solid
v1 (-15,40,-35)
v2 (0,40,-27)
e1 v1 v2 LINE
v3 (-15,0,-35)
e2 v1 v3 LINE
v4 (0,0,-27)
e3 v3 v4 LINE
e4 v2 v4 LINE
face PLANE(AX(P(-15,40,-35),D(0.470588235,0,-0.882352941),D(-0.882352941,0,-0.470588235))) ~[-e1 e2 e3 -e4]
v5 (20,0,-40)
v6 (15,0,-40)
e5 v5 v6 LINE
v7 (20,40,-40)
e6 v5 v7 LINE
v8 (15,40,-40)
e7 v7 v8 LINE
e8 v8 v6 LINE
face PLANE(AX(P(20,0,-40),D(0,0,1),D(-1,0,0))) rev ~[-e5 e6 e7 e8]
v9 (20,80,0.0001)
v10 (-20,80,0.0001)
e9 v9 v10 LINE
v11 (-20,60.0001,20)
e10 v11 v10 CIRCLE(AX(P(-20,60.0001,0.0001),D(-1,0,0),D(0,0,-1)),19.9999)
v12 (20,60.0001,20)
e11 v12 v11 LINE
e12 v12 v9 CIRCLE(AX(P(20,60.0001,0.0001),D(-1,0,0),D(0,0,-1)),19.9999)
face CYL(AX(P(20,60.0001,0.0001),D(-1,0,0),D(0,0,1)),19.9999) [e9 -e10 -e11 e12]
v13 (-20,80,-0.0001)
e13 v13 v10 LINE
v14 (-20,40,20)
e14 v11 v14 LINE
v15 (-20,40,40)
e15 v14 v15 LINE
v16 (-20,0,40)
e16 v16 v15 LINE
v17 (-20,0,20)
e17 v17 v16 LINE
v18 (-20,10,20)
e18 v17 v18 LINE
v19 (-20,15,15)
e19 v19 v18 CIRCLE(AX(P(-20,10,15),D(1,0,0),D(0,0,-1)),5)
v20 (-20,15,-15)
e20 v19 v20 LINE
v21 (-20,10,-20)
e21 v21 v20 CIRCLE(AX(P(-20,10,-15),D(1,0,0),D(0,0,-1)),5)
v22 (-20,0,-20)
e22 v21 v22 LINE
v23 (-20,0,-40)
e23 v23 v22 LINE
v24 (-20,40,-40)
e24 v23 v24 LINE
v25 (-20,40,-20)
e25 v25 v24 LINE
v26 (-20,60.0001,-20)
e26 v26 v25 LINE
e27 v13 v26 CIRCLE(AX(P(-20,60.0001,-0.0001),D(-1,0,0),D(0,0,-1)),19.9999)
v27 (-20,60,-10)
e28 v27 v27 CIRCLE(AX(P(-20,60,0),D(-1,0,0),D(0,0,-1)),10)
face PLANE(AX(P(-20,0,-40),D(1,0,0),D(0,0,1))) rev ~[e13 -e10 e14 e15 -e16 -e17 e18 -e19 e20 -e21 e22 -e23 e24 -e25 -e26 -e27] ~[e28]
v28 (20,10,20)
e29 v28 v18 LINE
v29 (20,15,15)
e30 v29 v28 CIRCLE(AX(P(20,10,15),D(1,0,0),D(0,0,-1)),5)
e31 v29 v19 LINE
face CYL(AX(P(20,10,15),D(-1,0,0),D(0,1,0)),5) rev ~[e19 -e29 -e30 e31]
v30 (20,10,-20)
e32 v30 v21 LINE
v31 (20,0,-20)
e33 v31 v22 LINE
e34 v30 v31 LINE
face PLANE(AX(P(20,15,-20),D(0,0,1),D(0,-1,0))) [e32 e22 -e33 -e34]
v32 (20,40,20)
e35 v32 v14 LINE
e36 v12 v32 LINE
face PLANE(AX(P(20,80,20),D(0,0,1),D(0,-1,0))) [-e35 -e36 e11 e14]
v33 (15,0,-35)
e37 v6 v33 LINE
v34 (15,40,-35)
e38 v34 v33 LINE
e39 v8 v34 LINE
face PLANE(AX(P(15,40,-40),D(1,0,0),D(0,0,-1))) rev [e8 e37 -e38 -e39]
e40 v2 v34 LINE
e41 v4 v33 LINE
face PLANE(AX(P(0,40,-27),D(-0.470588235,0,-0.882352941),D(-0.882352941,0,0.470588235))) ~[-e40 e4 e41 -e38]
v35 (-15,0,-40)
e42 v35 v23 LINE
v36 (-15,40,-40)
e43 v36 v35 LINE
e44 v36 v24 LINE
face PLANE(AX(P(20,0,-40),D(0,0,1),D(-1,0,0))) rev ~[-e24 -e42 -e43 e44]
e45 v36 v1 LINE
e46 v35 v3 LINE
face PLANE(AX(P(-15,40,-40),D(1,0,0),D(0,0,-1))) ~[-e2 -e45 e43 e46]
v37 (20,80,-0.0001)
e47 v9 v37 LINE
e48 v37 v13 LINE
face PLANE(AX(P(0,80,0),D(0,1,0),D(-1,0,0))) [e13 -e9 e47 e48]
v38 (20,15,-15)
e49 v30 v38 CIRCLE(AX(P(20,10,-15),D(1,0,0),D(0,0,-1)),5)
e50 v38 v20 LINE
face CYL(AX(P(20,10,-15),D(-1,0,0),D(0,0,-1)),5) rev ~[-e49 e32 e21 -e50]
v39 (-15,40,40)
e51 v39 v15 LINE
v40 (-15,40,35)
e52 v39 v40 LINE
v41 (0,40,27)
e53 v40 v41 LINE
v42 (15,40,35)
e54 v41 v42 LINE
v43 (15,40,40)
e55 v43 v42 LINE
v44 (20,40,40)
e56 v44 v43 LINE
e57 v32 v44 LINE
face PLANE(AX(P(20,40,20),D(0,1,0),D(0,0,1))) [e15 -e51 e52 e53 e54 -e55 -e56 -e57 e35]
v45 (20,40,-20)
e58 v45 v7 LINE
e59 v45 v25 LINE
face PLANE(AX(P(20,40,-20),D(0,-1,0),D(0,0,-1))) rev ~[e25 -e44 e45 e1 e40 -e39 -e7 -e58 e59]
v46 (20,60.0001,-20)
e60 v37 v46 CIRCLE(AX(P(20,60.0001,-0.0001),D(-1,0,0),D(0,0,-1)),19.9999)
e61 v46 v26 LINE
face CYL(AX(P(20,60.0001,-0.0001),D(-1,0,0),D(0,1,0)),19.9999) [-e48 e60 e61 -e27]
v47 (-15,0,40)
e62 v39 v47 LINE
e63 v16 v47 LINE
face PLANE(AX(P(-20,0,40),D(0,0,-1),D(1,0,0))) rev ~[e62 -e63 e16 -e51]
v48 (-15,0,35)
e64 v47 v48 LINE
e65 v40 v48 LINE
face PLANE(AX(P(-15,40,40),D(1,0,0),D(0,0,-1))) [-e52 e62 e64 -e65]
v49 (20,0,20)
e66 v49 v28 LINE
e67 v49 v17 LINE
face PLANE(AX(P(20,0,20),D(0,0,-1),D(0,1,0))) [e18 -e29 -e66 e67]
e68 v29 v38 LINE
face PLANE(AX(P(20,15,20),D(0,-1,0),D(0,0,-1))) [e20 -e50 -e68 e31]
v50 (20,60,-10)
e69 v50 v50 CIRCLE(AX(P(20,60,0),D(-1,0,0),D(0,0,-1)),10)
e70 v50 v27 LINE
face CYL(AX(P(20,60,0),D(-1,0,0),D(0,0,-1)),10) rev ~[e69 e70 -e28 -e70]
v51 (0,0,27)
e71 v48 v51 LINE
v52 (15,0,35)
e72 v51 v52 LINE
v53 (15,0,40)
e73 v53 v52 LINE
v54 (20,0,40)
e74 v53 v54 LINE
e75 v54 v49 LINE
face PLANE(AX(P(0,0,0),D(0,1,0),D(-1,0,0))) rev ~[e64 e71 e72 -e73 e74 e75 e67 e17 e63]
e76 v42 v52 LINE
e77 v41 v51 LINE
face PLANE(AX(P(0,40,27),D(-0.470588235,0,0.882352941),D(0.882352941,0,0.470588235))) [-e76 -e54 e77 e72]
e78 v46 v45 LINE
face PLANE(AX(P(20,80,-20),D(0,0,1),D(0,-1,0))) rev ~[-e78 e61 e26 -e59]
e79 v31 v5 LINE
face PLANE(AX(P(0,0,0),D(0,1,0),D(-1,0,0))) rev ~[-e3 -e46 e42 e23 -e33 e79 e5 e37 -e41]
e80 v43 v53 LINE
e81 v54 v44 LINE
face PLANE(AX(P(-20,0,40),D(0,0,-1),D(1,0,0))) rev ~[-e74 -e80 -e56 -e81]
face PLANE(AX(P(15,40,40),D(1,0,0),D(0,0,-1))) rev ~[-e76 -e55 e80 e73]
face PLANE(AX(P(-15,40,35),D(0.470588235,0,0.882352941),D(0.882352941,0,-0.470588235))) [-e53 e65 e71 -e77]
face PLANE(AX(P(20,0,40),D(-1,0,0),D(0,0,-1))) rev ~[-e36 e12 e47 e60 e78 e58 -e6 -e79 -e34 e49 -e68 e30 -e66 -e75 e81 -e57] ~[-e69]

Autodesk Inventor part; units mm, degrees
ref_plane "YZ Plane" through (0, 0, 0) normal (1, 0, 0) x (0, 1, 0)
ref_plane "XZ Plane" through (0, 0, 0) normal (0, 1, 0) x (-1, 0, 0)
ref_plane "XY Plane" through (0, 0, 0) normal (0, 0, 1) x (1, 0, 0)
sketch "Esboço1" plane through (0, 0, 0) normal (0, 1, 0) x (-1, 0, 0)
  line L0 (20, 40) -> (-20, 40)
  line L1 (-20, 40) -> (-20, -40)
  line L2 (-20, -40) -> (20, -40)
  line L3 (20, -40) -> (20, 40)
  line L4 (20, 40) -> (-20, -40) construction
  line L5 (-20, 40) -> (20, -40) construction
  point P0 (0, 0)
  dimension "d0" = 40
  dimension "d1" = 80
extrude "Extrusão1" add sketch "Esboço1" along normal blind 80
sketch "Esboço2" plane through (20, 0, 40) normal (1, 0, 0) x (0, 0, -1)
  line L0 (0, 80) -> (80, 80) projected
  line L1 (0, 80) -> (20, 80)
  line L2 (20, 80) -> (20, 40)
  line L3 (20, 40) -> (0, 40)
  line L4 (0, 40) -> (0, 80)
  line L5 (80, 80) -> (60, 80)
  line L6 (60, 80) -> (60, 40)
  line L7 (60, 40) -> (80, 40)
  line L8 (80, 40) -> (80, 80)
  line L9 (0, 0) -> (80, 0) projected
  point P0 (40, 0)
  point P1 (60, 60)
  point P2 (20, 80)
  dimension "d4" = 40
  dimension "d5" = 20
  dimension "d6" = 20
extrude "Extrusão2" cut sketch "Esboço2" against normal blind 80
fillet "Arredondamento1" radius 20 2 edges at (0, 80, 20) (0, 80, -20)
sketch "Esboço3" plane through (20, 0, 40) normal (1, 0, 0) x (0, 0, -1)
  arc A0 (60, 60) -> (20, 60) centre (40, 60) ccw projected
  point P0 (40, 0)
hole "Furo1" at (20, 60, 0) direction (-1, 0, 0) diameter 20 end through all
sketch "Esboço4" plane through (20, 40, 40) normal (0, 1, 0) x (1, 0, 0)
  line L0 (0, 0) -> (0, 80) projected
  line L1 (0, 0) -> (-5, 0)
  line L2 (-40, 0) -> (0, 0) projected
  line L3 (-5, 0) -> (-5, 5)
  line L4 (-40, 0) -> (-35, 0)
  line L5 (-35, 0) -> (-35, 5)
  line L6 (-35, 0) -> (-20, 0) construction
  line L7 (-20, 0) -> (-20, 13) construction
  line L8 (-35, 5) -> (-20, 13)
  line L9 (-20, 13) -> (-5, 5)
  point P0 (-20, 40)
  dimension "d17" = 5
  dimension "d18" = 5
  dimension "d19" = 5
  dimension "d20" = 15
  dimension "d21" = 13
extrude "Extrusão3" cut sketch "Esboço4" against normal blind 80
mirror "Espelhar1" about plane through (0, 0, 0) normal (0, 0, 1) of "Extrusão3"
sketch "Esboço5" plane through (20, 0, 40) normal (1, 0, 0) x (0, 0, -1)
  point P0 (40, 0)
sketch "Esboço6" plane through (20, 0, 40) normal (1, 0, 0) x (0, 0, -1)
  line L0 (0, 0) -> (0, 40) construction
  line L1 (0, 0) -> (20, 0) construction
  line L2 (0, 0) -> (80, 0) construction
  line L3 (20, 0) -> (20, 15)
  line L4 (20, 15) -> (60, 15)
  line L5 (60, 15) -> (60, 0)
  line L6 (60, 0) -> (20, 0)
  point P0 (40, 0)
  dimension "d24" = 20
  dimension "d25" = 15
  dimension "d26" = 40
extrude "Extrusão4" cut sketch "Esboço6" against normal blind 80
fillet "Arredondamento2" radius 5 2 edges at (0, 15, -20) (0, 15, 20)
